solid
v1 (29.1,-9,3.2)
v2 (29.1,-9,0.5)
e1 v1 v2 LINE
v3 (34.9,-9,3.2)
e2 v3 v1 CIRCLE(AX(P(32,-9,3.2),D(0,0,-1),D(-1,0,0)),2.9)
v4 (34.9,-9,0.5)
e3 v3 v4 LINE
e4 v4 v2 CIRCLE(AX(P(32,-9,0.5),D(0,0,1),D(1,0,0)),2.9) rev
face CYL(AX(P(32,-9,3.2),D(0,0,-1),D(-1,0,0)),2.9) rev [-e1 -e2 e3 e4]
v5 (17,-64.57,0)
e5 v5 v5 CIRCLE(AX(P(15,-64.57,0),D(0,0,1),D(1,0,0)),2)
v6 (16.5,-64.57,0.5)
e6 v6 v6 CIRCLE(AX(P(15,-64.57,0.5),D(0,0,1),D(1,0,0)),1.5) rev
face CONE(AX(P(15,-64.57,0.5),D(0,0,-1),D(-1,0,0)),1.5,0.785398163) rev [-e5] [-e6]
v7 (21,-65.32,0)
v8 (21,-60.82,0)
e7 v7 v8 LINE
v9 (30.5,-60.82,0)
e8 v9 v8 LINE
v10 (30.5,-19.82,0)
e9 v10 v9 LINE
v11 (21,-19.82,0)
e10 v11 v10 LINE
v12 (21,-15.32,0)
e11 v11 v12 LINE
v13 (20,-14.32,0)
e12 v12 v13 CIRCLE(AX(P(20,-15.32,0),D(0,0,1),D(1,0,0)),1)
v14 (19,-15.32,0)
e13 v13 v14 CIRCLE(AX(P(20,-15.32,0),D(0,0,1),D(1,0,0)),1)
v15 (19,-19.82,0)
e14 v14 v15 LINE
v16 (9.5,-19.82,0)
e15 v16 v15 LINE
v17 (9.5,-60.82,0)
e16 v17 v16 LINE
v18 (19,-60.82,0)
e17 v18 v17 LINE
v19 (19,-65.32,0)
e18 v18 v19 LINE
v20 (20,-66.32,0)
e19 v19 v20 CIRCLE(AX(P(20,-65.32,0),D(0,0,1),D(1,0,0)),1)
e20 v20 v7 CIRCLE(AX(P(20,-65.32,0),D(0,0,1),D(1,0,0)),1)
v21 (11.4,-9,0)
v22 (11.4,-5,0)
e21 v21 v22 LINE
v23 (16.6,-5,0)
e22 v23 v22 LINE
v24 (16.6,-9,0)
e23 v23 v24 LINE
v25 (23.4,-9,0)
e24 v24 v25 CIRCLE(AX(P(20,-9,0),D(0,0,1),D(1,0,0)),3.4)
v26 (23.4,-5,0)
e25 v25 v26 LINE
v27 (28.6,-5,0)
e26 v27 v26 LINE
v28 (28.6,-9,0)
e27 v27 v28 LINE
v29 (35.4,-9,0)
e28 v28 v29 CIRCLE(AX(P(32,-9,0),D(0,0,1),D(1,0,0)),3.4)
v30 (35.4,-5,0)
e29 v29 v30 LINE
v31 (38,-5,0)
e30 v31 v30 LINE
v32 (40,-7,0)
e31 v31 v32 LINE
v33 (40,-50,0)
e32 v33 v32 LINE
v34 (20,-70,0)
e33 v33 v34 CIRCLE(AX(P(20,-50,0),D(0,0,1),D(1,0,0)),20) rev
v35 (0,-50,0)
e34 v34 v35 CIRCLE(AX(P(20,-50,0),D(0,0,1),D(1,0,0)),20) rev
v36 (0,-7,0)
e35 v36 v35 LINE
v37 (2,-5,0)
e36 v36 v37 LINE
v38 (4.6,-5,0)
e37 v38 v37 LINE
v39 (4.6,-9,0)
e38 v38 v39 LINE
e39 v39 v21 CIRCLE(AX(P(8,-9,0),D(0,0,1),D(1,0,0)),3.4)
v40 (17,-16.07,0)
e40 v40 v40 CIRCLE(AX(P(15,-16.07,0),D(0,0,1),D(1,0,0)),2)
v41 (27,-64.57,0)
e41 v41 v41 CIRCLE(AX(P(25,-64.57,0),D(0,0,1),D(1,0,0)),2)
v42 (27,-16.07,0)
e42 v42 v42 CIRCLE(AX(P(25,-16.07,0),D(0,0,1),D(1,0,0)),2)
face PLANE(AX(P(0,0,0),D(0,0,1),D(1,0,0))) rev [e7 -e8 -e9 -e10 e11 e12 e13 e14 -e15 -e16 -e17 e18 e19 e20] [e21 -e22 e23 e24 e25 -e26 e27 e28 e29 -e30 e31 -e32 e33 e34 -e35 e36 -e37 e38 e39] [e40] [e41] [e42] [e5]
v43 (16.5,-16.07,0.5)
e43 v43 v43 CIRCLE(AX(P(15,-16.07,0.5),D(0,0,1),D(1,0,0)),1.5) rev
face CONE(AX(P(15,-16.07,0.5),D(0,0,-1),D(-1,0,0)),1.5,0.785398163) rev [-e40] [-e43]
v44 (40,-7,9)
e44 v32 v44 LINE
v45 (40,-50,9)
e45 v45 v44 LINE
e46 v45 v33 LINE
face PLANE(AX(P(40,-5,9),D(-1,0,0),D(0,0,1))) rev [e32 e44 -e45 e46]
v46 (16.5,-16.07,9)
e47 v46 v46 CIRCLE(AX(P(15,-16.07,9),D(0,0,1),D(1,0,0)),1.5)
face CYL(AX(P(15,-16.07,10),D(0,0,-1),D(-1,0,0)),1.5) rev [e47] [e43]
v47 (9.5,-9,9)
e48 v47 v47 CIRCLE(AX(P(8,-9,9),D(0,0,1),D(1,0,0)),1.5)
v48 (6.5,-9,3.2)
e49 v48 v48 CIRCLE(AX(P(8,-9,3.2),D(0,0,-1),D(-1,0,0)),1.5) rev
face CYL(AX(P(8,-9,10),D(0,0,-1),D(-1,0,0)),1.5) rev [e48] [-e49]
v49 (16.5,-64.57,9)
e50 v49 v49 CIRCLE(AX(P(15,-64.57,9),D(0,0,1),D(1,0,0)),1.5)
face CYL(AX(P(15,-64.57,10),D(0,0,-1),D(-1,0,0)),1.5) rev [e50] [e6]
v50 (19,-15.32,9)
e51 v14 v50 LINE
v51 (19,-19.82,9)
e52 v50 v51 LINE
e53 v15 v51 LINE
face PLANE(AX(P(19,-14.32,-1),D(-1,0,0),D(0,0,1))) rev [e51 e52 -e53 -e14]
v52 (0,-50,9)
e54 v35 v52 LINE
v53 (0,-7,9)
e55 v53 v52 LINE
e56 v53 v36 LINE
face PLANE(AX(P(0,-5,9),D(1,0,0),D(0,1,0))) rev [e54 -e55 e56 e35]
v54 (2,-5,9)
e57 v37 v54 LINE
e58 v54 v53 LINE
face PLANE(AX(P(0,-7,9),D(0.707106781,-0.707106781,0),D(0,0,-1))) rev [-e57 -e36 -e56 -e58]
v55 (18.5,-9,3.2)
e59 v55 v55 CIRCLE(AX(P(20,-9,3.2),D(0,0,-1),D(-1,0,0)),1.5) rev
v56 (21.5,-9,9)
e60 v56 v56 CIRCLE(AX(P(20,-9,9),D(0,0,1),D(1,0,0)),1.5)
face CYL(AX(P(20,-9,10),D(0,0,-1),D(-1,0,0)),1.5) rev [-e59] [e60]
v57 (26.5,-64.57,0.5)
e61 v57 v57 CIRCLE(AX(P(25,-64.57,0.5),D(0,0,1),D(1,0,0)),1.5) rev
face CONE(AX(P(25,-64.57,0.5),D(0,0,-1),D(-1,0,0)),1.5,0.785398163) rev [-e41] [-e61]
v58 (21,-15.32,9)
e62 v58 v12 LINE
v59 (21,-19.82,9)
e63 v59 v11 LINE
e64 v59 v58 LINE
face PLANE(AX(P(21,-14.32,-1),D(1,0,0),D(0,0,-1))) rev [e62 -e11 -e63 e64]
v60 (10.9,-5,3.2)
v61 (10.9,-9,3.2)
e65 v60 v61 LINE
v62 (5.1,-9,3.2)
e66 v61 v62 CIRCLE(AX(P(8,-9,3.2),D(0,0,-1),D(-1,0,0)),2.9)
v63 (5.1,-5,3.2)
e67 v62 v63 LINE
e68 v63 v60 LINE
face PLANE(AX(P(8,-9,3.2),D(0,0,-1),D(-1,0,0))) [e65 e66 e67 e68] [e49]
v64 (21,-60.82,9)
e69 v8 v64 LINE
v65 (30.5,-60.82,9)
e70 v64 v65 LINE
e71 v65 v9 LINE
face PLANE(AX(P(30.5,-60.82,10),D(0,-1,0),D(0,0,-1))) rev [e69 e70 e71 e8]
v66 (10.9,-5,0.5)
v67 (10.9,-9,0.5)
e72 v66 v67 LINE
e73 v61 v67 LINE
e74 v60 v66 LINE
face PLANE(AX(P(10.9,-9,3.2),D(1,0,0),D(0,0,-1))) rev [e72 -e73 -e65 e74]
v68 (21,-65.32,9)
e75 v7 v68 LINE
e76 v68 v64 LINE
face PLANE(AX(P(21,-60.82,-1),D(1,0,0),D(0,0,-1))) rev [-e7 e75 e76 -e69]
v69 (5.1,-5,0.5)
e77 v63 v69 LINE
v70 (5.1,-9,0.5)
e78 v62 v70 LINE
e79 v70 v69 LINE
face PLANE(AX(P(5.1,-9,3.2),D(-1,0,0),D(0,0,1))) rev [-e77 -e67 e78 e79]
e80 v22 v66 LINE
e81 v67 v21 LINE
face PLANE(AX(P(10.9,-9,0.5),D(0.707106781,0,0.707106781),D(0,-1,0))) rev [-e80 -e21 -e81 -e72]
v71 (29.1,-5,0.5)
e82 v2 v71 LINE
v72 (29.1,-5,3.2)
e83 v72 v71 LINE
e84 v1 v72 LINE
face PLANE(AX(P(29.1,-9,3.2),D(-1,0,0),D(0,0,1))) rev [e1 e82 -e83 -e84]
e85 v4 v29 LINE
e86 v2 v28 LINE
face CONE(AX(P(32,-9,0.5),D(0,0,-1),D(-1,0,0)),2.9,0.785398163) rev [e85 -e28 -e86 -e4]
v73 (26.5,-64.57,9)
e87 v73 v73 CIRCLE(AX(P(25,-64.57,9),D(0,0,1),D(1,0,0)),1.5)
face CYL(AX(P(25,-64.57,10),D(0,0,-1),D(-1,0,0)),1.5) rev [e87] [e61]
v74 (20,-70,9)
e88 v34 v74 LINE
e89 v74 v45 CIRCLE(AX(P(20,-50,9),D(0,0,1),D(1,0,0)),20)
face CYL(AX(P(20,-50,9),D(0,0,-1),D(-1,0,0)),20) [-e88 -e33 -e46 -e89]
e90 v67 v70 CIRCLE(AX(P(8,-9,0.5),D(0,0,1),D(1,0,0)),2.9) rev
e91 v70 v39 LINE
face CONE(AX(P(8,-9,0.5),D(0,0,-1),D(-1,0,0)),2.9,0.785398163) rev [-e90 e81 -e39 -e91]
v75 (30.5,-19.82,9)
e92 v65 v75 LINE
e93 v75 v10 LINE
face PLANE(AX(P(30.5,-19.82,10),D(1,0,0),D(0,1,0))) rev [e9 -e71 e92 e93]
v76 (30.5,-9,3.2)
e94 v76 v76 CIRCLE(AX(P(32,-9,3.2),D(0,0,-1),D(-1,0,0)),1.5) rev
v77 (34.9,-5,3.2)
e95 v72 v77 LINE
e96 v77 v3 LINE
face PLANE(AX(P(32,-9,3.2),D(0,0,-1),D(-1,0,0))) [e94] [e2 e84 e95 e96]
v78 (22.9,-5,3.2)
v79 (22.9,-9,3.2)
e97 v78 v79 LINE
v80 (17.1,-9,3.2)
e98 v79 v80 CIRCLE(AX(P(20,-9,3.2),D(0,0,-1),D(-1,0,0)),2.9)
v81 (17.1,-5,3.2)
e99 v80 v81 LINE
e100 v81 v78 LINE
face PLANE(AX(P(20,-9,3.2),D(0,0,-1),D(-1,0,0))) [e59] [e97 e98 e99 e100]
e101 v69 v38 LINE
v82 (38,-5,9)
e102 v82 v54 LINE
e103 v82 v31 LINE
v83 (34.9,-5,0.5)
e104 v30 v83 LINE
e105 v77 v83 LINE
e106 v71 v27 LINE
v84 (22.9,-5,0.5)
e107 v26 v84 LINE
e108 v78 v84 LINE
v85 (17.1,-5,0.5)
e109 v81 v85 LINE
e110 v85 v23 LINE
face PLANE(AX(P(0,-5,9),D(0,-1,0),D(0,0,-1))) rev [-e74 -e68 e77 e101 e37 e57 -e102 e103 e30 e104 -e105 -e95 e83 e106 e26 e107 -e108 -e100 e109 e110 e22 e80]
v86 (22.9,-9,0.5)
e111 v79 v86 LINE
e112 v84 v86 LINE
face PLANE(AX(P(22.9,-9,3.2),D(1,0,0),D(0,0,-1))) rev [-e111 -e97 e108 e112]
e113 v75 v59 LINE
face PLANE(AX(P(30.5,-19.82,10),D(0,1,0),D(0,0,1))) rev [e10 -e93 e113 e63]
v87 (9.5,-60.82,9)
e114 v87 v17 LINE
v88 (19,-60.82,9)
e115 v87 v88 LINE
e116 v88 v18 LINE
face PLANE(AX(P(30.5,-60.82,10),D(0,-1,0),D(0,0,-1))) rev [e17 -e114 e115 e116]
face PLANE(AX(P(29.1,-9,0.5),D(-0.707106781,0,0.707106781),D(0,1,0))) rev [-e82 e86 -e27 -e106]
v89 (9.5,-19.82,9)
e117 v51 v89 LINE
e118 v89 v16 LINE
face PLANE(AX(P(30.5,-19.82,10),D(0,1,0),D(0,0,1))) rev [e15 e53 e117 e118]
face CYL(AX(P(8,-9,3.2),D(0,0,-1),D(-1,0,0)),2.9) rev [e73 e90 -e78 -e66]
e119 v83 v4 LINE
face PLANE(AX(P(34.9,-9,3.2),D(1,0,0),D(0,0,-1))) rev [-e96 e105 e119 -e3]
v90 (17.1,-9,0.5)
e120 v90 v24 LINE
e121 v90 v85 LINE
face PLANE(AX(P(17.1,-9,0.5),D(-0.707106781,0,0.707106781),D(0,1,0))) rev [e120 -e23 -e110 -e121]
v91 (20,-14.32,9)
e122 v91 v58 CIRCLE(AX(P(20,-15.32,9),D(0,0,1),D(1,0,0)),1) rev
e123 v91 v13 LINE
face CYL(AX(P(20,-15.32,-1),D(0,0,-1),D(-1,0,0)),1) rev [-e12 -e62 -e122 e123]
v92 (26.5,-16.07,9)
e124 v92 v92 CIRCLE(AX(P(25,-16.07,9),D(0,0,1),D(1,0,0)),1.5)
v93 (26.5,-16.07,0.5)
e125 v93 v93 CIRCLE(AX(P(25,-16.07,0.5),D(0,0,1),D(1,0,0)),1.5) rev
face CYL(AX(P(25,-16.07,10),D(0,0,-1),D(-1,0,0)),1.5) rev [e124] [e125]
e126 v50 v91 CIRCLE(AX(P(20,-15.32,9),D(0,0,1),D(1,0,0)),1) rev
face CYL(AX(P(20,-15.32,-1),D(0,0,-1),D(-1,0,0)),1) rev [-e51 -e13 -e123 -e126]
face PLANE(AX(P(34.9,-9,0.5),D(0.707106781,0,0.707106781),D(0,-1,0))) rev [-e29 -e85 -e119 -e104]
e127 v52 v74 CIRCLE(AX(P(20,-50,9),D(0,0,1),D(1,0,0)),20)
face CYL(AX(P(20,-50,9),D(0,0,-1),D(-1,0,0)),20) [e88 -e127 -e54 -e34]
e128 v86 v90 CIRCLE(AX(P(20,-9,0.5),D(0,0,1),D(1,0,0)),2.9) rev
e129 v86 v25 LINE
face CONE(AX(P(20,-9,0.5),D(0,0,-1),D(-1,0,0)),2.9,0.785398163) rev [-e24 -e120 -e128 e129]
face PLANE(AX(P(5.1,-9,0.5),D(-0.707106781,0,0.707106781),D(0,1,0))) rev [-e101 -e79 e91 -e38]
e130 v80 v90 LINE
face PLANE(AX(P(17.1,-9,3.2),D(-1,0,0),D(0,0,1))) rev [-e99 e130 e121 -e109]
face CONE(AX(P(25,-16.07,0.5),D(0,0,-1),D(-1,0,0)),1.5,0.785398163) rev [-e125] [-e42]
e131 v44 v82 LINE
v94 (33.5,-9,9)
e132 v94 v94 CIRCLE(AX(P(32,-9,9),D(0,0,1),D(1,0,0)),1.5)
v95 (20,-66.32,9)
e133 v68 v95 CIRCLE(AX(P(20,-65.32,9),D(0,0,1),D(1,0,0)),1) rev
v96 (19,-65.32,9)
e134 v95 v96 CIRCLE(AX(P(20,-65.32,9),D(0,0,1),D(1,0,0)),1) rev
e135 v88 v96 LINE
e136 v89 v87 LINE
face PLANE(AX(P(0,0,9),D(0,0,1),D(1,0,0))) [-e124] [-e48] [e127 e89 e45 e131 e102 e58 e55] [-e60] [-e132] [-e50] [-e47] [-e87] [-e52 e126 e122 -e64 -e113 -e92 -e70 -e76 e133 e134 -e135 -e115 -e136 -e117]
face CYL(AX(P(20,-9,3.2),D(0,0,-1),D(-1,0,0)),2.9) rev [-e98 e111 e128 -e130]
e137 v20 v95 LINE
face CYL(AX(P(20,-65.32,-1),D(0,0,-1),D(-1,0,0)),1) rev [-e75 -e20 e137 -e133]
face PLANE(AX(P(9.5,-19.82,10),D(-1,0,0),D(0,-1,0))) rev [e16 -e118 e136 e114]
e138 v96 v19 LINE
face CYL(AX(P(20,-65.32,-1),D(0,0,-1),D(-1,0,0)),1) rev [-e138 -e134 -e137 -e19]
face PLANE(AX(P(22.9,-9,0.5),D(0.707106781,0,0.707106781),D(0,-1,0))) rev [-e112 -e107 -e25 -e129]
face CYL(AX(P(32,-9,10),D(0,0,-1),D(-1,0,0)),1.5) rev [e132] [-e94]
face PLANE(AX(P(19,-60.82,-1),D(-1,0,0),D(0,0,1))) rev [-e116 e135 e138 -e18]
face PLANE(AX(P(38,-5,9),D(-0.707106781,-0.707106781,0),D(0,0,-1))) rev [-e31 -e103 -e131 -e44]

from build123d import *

# Parameters (mm, degrees)
SKETCH_1_W          = 40
SKETCH_1_H          = 65
EXTRUDE_1_DEPTH     = 9
CHAMFER_1_SIZE      = 2
FILLET_3_R          = 20
SKETCH_2_W          = 21
SKETCH_2_H          = 41
CUT_EXTRUDE_1_DEPTH = 10
SKETCH_3_W          = 2
SKETCH_3_H          = 5.5
CUT_EXTRUDE_2_DEPTH = 10
SKETCH_4_R          = 1.5
CUT_EXTRUDE_3_DEPTH = 10
SKETCH_5_R          = 1.5
CUT_EXTRUDE_4_DEPTH = 10
FILLET_4_R          = 1
CUT_EXTRUDE_5_DEPTH = 3.2
CHAMFER_2_SIZE      = 0.5


with BuildPart() as part:
    # 草图1 → 凸台-拉伸1 (new body)
    with BuildSketch(Plane.XY):
        with Locations((20, -37.5)):
            Rectangle(SKETCH_1_W, SKETCH_1_H)
    extrude(amount=EXTRUDE_1_DEPTH)

    # 倒角1
    chamfer_1_edges = [part.edges().sort_by_distance(p)[0] for p in [
        (0, -5, 4.5),
        (40, -5, 4.5),
    ]]
    chamfer(chamfer_1_edges, length=CHAMFER_1_SIZE)

    # 圆角3
    fillet_3_edges = [part.edges().sort_by_distance(p)[0] for p in [
        (0, -70, 4.5),
        (40, -70, 4.5),
    ]]
    fillet(fillet_3_edges, radius=FILLET_3_R - 0.0001)  # a hair under: the kernel refuses the full size

    # 草图2 → 切除-拉伸1 (cut)
    with BuildSketch(Plane(origin=(0, 0, 0), x_dir=(-1, 0, 0), z_dir=(0, 0, -1))):
        with Locations((-20, -40.32)):
            Rectangle(SKETCH_2_W, SKETCH_2_H)
    extrude(amount=-CUT_EXTRUDE_1_DEPTH, mode=Mode.SUBTRACT)

    # 草图3 → 切除-拉伸2 (cut)
    with BuildSketch(Plane.XY.offset(9)):
        with Locations((20, -17.07)):
            Rectangle(SKETCH_3_W, SKETCH_3_H)
        with Locations((20, -63.57)):
            Rectangle(SKETCH_3_W, SKETCH_3_H)
    extrude(amount=-CUT_EXTRUDE_2_DEPTH, mode=Mode.SUBTRACT)

    # 草图4 → 切除-拉伸3 (cut)
    with BuildSketch(Plane(origin=(0, 0, 0), x_dir=(-1, 0, 0), z_dir=(0, 0, -1))):
        with Locations((-25, -16.07)):
            Circle(SKETCH_4_R)
        with Locations((-15, -16.07)):
            Circle(SKETCH_4_R)
        with Locations((-25, -64.57)):
            Circle(SKETCH_4_R)
        with Locations((-15, -64.57)):
            Circle(SKETCH_4_R)
    extrude(amount=-CUT_EXTRUDE_3_DEPTH, mode=Mode.SUBTRACT)

    # 草图5 → 切除-拉伸4 (cut)
    with BuildSketch(Plane(origin=(0, 0, 0), x_dir=(-1, 0, 0), z_dir=(0, 0, -1))):
        with Locations((-32, -9)):
            Circle(SKETCH_5_R)
        with Locations((-20, -9)):
            Circle(SKETCH_5_R)
        with Locations((-8, -9)):
            Circle(SKETCH_5_R)
    extrude(amount=-CUT_EXTRUDE_4_DEPTH, mode=Mode.SUBTRACT)

    # 圆角4
    fillet_4_edges = [part.edges().sort_by_distance(p)[0] for p in [
        (21, -66.32, 4.5),
        (19, -66.32, 4.5),
        (21, -14.32, 4.5),
        (19, -14.32, 4.5),
    ]]
    fillet(fillet_4_edges, radius=FILLET_4_R - 0.0001)  # a hair under: the kernel refuses the full size

    # 草图7 → 切除-拉伸5 (cut)
    with BuildSketch(Plane(origin=(0, 0, 0), x_dir=(-1, 0, 0), z_dir=(0, 0, -1))):
        with BuildLine():
            Line((-34.9, -9), (-34.9, -5))
            Line((-34.9, -5), (-29.1, -5))
            Line((-29.1, -5), (-29.1, -9))
            ThreePointArc((-29.1, -9), (-32, -11.9), (-34.9, -9))
        make_face()
        with BuildLine():
            Line((-17.1, -9), (-17.1, -5))
            Line((-17.1, -5), (-22.9, -5))
            Line((-22.9, -5), (-22.9, -9))
            ThreePointArc((-22.9, -9), (-20, -11.9), (-17.1, -9))
        make_face()
        with BuildLine():
            Line((-5.1, -9), (-5.1, -5))
            Line((-5.1, -5), (-10.9, -5))
            Line((-10.9, -5), (-10.9, -9))
            ThreePointArc((-10.9, -9), (-8, -11.9), (-5.1, -9))
        make_face()
    extrude(amount=-CUT_EXTRUDE_5_DEPTH, mode=Mode.SUBTRACT)

    # 倒角2
    chamfer_2_edges = [part.edges().sort_by_distance(p)[0] for p in [
        (16.5, -16.07, 0),
        (26.5, -64.57, 0),
        (16.5, -64.57, 0),
        (26.5, -16.07, 0),
        (32, -11.9, 0),
        (29.1, -7, 0),
        (34.9, -7, 0),
        (20, -11.9, 0),
        (17.1, -7, 0),
        (22.9, -7, 0),
        (8, -11.9, 0),
        (5.1, -7, 0),
        (10.9, -7, 0),
    ]]
    chamfer(chamfer_2_edges, length=CHAMFER_2_SIZE)


solid = part.part
